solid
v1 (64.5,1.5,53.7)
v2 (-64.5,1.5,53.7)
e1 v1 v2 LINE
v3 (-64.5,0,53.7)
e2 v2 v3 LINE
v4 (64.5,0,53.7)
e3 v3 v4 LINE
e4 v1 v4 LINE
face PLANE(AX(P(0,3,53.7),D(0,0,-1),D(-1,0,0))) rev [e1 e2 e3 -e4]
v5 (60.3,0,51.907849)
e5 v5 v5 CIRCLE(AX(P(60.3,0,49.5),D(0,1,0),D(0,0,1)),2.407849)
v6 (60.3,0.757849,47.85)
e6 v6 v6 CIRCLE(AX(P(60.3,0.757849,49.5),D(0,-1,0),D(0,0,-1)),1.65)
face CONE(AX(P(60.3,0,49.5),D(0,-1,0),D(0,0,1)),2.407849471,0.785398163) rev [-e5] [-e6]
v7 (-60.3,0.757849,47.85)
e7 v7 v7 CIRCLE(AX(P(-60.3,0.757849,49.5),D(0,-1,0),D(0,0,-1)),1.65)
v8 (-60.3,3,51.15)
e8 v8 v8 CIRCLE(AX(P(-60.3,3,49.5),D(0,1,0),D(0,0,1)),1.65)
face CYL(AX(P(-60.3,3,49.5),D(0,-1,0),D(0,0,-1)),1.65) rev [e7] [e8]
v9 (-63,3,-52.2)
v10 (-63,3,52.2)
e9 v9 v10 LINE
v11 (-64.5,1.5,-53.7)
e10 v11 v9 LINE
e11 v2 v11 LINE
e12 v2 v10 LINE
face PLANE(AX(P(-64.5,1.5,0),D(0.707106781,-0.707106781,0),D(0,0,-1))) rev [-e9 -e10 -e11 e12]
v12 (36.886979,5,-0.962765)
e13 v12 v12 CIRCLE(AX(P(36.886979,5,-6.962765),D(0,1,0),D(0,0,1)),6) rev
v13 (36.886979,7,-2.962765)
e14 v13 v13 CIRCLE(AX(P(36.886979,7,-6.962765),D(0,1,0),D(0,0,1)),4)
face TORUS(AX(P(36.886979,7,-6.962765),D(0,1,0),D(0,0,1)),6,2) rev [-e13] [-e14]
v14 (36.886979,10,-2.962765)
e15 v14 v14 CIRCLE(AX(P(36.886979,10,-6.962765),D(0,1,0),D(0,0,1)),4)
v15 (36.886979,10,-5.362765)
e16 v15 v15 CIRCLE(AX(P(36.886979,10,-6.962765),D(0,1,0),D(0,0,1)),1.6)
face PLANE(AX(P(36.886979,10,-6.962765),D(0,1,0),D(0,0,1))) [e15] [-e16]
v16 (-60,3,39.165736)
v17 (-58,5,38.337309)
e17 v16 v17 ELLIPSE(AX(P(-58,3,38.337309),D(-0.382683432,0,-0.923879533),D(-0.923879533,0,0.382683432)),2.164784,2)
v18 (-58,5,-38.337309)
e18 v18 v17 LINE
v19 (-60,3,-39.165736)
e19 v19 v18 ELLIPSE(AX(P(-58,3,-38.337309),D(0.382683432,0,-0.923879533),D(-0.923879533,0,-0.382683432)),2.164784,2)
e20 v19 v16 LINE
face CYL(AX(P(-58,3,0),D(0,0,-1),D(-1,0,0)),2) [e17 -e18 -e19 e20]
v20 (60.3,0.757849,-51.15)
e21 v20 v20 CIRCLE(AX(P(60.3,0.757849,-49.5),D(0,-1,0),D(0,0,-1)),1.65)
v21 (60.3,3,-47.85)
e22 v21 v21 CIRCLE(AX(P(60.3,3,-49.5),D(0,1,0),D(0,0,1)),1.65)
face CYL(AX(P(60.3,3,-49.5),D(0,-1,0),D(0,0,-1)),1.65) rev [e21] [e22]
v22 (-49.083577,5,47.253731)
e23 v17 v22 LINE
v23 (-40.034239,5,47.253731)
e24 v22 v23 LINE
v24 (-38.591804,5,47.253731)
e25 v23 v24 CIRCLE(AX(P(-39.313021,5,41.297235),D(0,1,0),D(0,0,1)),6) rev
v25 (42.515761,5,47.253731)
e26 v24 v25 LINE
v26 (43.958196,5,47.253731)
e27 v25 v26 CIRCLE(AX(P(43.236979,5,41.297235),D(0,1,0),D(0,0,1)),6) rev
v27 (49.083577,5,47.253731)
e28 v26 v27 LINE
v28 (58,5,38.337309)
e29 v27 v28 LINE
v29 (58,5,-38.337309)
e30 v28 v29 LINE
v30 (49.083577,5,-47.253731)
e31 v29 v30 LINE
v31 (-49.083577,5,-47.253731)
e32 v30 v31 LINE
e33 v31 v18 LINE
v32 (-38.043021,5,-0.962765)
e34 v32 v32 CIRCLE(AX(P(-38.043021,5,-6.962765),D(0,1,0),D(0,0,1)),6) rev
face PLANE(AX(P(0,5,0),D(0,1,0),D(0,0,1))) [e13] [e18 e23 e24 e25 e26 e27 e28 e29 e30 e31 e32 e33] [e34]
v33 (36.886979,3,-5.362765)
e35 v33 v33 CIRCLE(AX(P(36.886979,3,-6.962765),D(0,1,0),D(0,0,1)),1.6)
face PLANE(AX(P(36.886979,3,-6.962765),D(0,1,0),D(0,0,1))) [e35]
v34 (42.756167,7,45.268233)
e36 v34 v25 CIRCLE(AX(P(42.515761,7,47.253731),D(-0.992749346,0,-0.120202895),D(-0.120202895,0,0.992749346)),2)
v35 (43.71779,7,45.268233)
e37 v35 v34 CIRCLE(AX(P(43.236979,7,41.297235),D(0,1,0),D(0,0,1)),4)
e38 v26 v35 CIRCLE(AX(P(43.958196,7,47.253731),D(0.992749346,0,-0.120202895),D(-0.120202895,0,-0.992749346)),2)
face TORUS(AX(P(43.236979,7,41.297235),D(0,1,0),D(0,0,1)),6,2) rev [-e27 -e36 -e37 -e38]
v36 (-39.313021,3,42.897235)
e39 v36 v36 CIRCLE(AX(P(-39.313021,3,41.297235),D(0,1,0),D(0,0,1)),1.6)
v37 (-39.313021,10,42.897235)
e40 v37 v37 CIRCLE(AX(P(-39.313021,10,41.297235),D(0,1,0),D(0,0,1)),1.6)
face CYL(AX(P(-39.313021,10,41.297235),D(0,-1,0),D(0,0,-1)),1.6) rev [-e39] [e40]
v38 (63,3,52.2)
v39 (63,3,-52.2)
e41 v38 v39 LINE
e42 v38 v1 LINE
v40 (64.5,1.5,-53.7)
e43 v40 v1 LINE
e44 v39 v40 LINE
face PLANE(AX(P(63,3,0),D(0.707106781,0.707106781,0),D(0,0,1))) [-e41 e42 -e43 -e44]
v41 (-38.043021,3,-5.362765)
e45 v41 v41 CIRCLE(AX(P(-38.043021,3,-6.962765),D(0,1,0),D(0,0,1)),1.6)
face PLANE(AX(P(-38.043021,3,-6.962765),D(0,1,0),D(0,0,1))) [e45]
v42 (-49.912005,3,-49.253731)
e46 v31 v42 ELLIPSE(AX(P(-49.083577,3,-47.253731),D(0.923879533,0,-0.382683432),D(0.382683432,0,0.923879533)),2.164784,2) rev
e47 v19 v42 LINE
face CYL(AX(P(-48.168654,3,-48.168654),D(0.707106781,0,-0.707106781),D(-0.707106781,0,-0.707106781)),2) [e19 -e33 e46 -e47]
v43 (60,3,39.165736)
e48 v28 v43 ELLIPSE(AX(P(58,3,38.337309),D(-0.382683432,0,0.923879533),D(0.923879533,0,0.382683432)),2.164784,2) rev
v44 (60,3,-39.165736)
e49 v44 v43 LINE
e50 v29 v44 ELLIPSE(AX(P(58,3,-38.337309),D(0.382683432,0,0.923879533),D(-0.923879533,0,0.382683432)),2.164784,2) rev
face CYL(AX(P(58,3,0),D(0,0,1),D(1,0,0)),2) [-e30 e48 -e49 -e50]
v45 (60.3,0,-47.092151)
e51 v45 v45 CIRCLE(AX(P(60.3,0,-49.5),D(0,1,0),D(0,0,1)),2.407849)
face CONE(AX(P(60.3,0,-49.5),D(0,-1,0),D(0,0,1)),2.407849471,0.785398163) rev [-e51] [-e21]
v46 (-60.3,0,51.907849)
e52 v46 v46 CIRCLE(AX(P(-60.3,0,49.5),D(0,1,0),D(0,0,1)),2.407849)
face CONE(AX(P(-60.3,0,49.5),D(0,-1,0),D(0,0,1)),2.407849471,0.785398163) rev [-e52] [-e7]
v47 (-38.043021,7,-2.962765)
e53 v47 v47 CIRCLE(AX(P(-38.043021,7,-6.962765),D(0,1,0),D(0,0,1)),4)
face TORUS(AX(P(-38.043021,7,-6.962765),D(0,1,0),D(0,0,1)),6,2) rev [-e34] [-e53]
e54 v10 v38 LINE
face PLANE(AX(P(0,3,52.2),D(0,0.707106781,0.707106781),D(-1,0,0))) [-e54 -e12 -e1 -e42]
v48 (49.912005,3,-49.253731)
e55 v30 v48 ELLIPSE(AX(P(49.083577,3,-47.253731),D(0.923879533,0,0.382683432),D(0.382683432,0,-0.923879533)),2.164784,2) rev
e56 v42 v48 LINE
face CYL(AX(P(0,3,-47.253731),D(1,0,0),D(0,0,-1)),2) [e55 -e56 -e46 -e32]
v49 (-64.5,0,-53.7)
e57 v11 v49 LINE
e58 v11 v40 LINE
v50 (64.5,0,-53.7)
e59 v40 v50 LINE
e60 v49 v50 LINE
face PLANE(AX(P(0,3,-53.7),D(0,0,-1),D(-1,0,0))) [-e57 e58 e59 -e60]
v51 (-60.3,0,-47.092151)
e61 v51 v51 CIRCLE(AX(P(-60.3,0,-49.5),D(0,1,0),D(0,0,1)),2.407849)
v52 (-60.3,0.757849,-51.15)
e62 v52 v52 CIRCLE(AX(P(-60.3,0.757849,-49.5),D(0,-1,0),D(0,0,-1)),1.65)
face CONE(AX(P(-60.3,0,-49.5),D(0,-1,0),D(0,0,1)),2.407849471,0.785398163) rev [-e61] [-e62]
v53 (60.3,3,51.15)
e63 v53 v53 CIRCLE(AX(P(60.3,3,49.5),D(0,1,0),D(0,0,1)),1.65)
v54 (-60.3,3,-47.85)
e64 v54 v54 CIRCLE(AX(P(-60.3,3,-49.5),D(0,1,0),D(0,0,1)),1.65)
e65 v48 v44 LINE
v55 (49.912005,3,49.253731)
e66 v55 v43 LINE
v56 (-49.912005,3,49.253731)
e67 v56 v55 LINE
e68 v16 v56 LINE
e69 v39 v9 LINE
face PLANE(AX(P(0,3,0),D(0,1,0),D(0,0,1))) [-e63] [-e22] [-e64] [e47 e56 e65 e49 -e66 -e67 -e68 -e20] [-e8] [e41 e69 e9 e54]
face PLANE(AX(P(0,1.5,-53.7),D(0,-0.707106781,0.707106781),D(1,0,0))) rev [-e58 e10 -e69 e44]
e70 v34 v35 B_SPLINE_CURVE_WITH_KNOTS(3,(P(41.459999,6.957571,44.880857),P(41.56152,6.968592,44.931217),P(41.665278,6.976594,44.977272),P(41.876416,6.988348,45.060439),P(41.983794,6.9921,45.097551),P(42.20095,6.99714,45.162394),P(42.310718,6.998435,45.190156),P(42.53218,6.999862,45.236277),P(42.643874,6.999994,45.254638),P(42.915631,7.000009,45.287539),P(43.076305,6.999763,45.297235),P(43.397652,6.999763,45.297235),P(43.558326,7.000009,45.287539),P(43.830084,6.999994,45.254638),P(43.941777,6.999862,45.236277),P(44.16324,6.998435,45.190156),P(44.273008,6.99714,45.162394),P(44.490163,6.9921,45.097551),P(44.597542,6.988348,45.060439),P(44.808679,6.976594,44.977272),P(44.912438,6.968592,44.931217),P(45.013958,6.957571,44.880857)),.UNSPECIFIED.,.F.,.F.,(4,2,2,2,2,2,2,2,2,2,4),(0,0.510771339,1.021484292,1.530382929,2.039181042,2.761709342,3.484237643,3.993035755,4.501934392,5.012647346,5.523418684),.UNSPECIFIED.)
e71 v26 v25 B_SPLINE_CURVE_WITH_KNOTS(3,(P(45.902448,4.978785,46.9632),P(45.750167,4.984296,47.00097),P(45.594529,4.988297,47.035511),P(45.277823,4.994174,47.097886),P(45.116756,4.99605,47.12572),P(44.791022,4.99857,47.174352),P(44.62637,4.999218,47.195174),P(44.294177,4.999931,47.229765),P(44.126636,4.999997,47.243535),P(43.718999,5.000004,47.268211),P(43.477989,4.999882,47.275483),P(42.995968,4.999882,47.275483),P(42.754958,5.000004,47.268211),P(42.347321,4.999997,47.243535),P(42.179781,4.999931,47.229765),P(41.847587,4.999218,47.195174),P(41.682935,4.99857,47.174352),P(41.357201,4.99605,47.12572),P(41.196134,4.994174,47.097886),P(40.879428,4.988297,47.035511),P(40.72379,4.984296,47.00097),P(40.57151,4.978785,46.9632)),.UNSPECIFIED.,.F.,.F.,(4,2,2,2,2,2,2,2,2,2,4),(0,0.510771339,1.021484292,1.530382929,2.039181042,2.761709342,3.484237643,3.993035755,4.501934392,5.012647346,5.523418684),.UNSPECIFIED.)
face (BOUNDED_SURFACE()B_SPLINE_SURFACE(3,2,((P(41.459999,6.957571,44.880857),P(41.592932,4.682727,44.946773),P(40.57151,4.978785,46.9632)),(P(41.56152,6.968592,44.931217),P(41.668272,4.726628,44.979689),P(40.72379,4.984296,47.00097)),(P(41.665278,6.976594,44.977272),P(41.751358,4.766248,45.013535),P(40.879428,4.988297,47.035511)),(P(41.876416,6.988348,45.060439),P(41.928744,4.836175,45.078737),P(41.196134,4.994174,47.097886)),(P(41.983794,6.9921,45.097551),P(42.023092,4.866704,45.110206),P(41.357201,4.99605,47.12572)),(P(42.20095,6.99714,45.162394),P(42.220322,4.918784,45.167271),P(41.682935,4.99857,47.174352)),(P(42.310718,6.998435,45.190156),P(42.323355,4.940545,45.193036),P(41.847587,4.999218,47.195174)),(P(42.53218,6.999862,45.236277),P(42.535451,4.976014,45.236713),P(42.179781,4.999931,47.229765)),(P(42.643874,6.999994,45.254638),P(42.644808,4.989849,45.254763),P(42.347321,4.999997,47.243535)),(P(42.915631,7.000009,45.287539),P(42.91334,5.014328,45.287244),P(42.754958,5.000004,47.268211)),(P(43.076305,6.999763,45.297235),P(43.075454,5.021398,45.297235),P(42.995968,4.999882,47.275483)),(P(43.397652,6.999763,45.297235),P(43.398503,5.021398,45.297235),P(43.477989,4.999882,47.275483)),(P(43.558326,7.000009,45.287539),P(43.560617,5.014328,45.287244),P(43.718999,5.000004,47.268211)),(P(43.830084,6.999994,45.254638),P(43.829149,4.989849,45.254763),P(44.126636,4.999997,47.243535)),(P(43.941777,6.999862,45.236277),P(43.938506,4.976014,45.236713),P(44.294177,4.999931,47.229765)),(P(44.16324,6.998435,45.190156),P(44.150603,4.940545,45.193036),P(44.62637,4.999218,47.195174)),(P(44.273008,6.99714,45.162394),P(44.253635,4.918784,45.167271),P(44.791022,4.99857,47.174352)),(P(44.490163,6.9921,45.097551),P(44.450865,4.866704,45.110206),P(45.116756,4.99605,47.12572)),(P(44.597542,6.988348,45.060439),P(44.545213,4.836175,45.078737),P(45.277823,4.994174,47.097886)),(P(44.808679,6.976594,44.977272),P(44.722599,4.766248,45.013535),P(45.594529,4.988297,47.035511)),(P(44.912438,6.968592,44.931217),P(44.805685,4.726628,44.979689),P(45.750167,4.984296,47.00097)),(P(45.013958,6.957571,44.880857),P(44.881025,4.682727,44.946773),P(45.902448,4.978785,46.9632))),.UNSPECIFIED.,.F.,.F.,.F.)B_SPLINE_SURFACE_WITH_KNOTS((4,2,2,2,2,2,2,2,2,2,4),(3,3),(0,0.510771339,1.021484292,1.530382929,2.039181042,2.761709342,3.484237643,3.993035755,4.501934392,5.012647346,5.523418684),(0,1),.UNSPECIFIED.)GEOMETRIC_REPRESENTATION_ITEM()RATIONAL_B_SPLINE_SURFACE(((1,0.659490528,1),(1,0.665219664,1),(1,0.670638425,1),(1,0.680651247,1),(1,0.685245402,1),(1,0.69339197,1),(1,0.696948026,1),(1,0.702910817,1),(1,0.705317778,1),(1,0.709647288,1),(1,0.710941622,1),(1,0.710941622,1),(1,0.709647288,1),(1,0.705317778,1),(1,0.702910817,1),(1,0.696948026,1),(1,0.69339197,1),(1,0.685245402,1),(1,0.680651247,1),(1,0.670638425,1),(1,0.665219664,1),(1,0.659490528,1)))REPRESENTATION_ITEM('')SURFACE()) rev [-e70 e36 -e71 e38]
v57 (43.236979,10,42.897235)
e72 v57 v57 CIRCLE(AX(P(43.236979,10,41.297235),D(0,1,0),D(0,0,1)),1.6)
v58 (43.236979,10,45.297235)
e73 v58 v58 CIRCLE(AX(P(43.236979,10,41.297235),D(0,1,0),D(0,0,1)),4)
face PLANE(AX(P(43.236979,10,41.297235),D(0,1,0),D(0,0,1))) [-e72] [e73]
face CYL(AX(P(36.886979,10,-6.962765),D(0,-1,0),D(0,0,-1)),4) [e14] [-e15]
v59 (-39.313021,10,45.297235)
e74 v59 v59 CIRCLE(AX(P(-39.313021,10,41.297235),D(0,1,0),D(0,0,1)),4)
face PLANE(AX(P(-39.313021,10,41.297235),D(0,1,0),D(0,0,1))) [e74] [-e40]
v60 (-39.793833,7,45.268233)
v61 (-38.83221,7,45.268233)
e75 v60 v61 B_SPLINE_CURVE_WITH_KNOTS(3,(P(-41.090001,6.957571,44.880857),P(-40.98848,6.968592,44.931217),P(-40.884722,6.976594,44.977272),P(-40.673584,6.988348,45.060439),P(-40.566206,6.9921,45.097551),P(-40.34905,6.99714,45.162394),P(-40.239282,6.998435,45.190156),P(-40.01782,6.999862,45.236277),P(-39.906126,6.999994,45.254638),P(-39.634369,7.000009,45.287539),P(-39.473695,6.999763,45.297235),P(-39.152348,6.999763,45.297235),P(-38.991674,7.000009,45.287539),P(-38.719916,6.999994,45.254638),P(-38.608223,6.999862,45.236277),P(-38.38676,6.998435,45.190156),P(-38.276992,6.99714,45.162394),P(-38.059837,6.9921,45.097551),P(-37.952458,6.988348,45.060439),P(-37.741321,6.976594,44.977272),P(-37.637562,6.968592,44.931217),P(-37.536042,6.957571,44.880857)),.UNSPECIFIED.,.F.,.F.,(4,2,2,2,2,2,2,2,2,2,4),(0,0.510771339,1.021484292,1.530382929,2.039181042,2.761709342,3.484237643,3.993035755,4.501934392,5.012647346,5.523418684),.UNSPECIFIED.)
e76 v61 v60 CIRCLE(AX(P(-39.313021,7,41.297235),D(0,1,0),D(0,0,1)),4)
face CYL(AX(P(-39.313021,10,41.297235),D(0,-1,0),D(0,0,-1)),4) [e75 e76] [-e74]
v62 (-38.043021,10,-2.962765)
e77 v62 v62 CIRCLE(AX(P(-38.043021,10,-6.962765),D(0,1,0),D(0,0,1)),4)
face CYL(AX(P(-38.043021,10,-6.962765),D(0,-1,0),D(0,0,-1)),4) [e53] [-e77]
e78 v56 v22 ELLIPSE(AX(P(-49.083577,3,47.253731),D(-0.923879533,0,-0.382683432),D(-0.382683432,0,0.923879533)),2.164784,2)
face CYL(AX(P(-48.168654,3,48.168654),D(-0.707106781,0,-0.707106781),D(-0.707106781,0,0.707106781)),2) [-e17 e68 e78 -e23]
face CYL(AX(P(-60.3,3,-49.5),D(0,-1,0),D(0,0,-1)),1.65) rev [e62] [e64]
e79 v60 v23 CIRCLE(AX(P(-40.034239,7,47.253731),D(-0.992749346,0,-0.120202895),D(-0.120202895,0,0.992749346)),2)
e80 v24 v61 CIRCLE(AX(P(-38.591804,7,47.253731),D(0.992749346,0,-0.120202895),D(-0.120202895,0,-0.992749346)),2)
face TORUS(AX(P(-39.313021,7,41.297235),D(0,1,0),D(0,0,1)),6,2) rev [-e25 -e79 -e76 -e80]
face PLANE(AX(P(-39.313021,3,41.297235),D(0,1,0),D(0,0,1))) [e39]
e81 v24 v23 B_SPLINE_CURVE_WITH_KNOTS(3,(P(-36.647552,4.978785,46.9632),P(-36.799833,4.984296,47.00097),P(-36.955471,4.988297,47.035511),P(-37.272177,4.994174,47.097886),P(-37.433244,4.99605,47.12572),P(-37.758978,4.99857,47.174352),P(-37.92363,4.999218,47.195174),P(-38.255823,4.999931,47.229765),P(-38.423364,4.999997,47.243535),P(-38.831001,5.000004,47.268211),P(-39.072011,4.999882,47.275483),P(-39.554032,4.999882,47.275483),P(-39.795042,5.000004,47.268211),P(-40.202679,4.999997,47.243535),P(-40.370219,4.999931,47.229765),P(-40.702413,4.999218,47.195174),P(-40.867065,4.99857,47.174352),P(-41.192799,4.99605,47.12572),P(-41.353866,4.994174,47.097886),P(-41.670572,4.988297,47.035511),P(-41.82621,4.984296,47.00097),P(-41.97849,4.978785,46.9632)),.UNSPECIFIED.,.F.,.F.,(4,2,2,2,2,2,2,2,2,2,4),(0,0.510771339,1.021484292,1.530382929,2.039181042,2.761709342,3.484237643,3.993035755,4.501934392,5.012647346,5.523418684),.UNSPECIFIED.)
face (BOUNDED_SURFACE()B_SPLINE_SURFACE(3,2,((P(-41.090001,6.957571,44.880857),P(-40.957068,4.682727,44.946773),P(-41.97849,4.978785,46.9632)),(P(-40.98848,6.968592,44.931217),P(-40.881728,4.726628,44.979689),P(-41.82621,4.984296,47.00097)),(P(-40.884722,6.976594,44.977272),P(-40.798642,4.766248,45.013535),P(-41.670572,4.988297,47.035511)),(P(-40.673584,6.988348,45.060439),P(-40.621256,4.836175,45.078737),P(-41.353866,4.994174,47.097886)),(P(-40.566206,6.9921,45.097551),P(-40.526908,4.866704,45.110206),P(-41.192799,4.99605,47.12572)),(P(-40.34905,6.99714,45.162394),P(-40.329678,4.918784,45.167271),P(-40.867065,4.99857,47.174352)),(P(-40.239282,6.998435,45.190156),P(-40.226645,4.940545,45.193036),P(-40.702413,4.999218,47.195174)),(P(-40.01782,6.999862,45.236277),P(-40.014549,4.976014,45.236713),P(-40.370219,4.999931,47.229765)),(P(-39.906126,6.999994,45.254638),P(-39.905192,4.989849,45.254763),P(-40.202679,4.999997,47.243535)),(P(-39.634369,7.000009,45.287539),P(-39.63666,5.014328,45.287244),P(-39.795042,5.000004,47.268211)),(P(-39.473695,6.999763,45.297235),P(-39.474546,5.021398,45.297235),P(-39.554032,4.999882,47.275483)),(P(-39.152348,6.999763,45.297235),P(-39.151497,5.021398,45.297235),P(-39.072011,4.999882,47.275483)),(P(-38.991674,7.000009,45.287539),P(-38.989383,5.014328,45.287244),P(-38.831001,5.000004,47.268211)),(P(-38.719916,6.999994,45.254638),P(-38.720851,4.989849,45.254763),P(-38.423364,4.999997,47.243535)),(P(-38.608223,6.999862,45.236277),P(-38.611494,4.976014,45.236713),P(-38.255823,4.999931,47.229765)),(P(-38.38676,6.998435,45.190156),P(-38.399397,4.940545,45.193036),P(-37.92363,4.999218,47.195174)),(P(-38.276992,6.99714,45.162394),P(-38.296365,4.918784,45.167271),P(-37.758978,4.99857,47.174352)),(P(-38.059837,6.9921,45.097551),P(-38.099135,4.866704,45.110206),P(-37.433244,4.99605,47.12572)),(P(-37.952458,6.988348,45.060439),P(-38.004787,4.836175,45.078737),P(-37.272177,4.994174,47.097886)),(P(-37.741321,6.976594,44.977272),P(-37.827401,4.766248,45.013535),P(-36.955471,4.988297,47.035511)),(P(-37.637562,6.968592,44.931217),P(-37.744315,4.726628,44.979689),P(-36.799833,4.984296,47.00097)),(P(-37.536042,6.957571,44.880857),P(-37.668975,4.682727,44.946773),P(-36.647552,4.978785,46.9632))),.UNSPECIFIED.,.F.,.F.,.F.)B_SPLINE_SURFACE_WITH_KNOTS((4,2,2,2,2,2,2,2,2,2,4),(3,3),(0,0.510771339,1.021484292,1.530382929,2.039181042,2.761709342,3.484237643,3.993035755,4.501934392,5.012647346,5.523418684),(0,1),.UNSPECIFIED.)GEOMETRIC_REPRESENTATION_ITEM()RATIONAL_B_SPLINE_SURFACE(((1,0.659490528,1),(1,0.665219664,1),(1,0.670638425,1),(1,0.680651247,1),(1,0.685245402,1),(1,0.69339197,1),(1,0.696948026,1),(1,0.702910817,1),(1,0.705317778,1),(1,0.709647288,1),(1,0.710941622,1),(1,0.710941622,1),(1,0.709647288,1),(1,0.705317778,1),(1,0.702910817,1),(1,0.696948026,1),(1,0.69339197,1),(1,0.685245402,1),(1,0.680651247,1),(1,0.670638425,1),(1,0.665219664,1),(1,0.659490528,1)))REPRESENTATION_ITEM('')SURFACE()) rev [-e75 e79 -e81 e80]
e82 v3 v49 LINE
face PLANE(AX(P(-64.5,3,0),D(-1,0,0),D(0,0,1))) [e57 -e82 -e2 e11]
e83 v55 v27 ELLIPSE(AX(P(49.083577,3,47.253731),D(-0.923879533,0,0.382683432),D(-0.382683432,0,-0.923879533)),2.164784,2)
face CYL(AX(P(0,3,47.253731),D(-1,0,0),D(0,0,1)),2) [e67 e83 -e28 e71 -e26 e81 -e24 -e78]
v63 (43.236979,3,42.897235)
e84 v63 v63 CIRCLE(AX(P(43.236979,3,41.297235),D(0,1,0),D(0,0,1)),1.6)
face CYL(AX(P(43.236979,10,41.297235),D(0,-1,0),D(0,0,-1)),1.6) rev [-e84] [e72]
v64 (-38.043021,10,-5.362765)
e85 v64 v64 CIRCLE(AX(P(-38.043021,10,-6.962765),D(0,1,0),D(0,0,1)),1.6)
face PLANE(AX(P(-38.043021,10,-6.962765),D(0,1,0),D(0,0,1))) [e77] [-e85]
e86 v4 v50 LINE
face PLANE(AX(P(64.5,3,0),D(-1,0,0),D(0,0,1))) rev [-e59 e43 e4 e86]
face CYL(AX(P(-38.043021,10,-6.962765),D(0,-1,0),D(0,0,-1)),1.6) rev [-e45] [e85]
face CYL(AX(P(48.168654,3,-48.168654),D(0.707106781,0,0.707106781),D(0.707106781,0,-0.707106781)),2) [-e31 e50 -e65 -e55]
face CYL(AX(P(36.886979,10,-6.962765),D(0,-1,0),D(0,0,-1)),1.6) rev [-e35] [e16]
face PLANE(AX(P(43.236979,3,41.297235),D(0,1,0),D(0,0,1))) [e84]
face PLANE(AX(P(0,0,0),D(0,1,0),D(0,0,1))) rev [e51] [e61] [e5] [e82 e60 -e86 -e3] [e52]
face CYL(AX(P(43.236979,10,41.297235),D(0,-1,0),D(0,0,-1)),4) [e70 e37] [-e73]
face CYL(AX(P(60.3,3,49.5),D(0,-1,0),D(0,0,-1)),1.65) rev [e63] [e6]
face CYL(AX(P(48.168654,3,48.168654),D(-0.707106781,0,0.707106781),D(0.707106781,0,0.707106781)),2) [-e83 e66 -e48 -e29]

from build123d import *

# Parameters (mm, degrees)
SKETCH1_W                    = 129
SKETCH1_H                    = 107.4
SKETCH1_R                    = 1.65
BOSS_EXTRUDE1_DEPTH          = 3
BOSS_EXTRUDE2_DEPTH          = 5
BOSS_EXTRUDE3_START          = 5
SKETCH2_R                    = 4
SKETCH2_R_2                  = 1.6
BOSS_EXTRUDE3_DEPTH          = 5
CUT_EXTRUDE1_START           = 3
CUT_EXTRUDE1_OUTLINE_R       = 1.6
CUT_EXTRUDE1_DEPTH           = 2
FILLET3_R                    = 2
FILLET4_R                    = 2
SKETCH1_4_R                  = 2.407849471
CUT_EXTRUDE2_DEPTH           = 1
CUT_EXTRUDE2_DRAFT           = 45
CUT_EXTRUDE2_PROFILE_2_DEPTH = 1
CUT_EXTRUDE2_PROFILE_2_DRAFT = 45
CUT_EXTRUDE2_PROFILE_3_DEPTH = 1
CUT_EXTRUDE2_PROFILE_3_DRAFT = 45
CUT_EXTRUDE2_PROFILE_4_DEPTH = 1
CUT_EXTRUDE2_PROFILE_4_DRAFT = 45
CHAMFER1_SIZE                = 1.5


# Read off the part's stored shape, not the designer's step: Cut-Extrude1
with BuildPart() as part:
    # Sketch1 → Boss-Extrude1 (new body)
    with BuildSketch(Plane(origin=(0, 0, 0), x_dir=(1, 0, 0), z_dir=(0, 1, 0))):
        Rectangle(SKETCH1_W, SKETCH1_H)
        with Locations(Location((-60.3, -49.5, 0), (0, 0, 270))):
            Circle(SKETCH1_R, mode=Mode.SUBTRACT)
        with Locations(Location((60.3, -49.5, 0), (0, 0, 270))):
            Circle(SKETCH1_R, mode=Mode.SUBTRACT)
        with Locations(Location((-60.3, 49.5, 0), (0, 0, 270))):
            Circle(SKETCH1_R, mode=Mode.SUBTRACT)
        Polygon((49.912004588, -49.253731343), (-49.912004588, -49.253731343), (-60, -39.165735931), (-60, 39.165735931), (-49.912004588, 49.253731343), (49.912004588, 49.253731343), (60, 39.165735931), (60, -39.165735931), align=None, mode=Mode.SUBTRACT)
        with Locations(Location((60.3, 49.5, 0), (0, 0, 270))):
            Circle(SKETCH1_R, mode=Mode.SUBTRACT)
    extrude(amount=BOSS_EXTRUDE1_DEPTH)

    # Sketch1<3> → Boss-Extrude2 (add)
    with BuildSketch(Plane(origin=(0, 0, 0), x_dir=(1, 0, 0), z_dir=(0, 1, 0))):
        Polygon((-49.912004588, 49.253731343), (-60, 39.165735931), (-60, -39.165735931), (-49.912004588, -49.253731343), (49.912004588, -49.253731343), (60, -39.165735931), (60, 39.165735931), (49.912004588, 49.253731343), align=None)
    extrude(amount=BOSS_EXTRUDE2_DEPTH)

    # Sketch2 → Boss-Extrude3 (add)
    # profile 1 of 4: a face of its own
    with BuildSketch(Plane(origin=(0, 0, 0), x_dir=(1, 0, 0), z_dir=(0, 1, 0)).offset(BOSS_EXTRUDE3_START)):
        with Locations(Location((-39.313021369, -41.297235267, 0), (0, 0, 270))):
            Circle(SKETCH2_R)
        with Locations(Location((-39.313021369, -41.297235267, 0), (0, 0, 270))):
            Circle(SKETCH2_R_2, mode=Mode.SUBTRACT)
    # profile 2 of 4: a face of its own
    with BuildSketch(Plane(origin=(0, 0, 0), x_dir=(1, 0, 0), z_dir=(0, 1, 0)).offset(BOSS_EXTRUDE3_START)):
        with Locations(Location((36.886978631, 6.962764733, 0), (0, 0, 270))):
            Circle(SKETCH2_R)
        with Locations(Location((36.886978631, 6.962764733, 0), (0, 0, 270))):
            Circle(SKETCH2_R_2, mode=Mode.SUBTRACT)
    # profile 3 of 4: a face of its own
    with BuildSketch(Plane(origin=(0, 0, 0), x_dir=(1, 0, 0), z_dir=(0, 1, 0)).offset(BOSS_EXTRUDE3_START)):
        with Locations(Location((-38.043021369, 6.962764733, 0), (0, 0, 270))):
            Circle(SKETCH2_R)
        with Locations(Location((-38.043021369, 6.962764733, 0), (0, 0, 270))):
            Circle(SKETCH2_R_2, mode=Mode.SUBTRACT)
    # profile 4 of 4: a face of its own
    with BuildSketch(Plane(origin=(0, 0, 0), x_dir=(1, 0, 0), z_dir=(0, 1, 0)).offset(BOSS_EXTRUDE3_START)):
        with Locations(Location((43.236978631, -41.297235267, 0), (0, 0, 270))):
            Circle(SKETCH2_R)
        with Locations(Location((43.236978631, -41.297235267, 0), (0, 0, 270))):
            Circle(SKETCH2_R_2, mode=Mode.SUBTRACT)
    extrude(amount=BOSS_EXTRUDE3_DEPTH)

    # Cut-Extrude1 outline → Cut-Extrude1 (cut)
    with BuildSketch(Plane(origin=(0, 0, 0), x_dir=(1, 0, 0), z_dir=(0, 1, 0)).offset(CUT_EXTRUDE1_START)):
        with Locations((-38.043021369, 6.962764733)):
            Circle(CUT_EXTRUDE1_OUTLINE_R)
        with Locations((-39.313021369, -41.297235267)):
            Circle(CUT_EXTRUDE1_OUTLINE_R)
        with Locations((43.236978631, -41.297235267)):
            Circle(CUT_EXTRUDE1_OUTLINE_R)
        with Locations((36.886978631, 6.962764733)):
            Circle(CUT_EXTRUDE1_OUTLINE_R)
    extrude(amount=CUT_EXTRUDE1_DEPTH, mode=Mode.SUBTRACT)

    # Fillet3
    fillet3_edges = [part.edges().sort_by_distance(p)[0] for p in [
        (-54.956002294, 5, -44.209733637),
        (54.956002294, 5, -44.209733637),
        (0, 5, -49.253731343),
        (54.956002294, 5, 44.209733637),
        (60, 5, 0),
        (-60, 5, 0),
        (-54.956002294, 5, 44.209733637),
        (0, 5, 49.253731343),
    ]]
    fillet(fillet3_edges, radius=FILLET3_R - 0.0001)  # a hair under: the kernel refuses the full size

    # Fillet4
    fillet4_edges = [part.edges().sort_by_distance(p)[0] for p in [
        (-39.313021369, 5, 37.297235267),
        (43.236978631, 5, 37.297235267),
        (36.886978631, 5, -10.962764733),
        (-38.043021369, 5, -10.962764733),
    ]]
    fillet(fillet4_edges, radius=FILLET4_R)


with BuildPart() as cut_extrude2_tool:
    # Sketch1<4> → Cut-Extrude2 (with draft: the straight prism first)
    with BuildSketch(Plane(origin=(0, 0, 0), x_dir=(1, 0, 0), z_dir=(0, 1, 0))):
        with Locations((-60.3, 49.5)):
            Circle(SKETCH1_4_R)
    extrude(amount=CUT_EXTRUDE2_DEPTH)
    # Cut-Extrude2: the draft: its side faces are tilted about the plane it starts from
    cut_extrude2_sides = [cut_extrude2_tool.faces().sort_by_distance(p)[0] for p in [
        (-62.707849471, 0.5, -49.5),
    ]]
    draft(cut_extrude2_sides, Plane(origin=(0, 0, 0), x_dir=(1, 0, 0), z_dir=(0, 1, 0)), CUT_EXTRUDE2_DRAFT)


with BuildPart() as part_1:
    add(part.part)

    # Cut-Extrude2: cut by cut_extrude2_tool
    add(cut_extrude2_tool.part, mode=Mode.SUBTRACT)


with BuildPart() as cut_extrude2_profile_2_tool:
    # Sketch1<4> → Cut-Extrude2 profile 2 (with draft: the straight prism first)
    with BuildSketch(Plane(origin=(0, 0, 0), x_dir=(1, 0, 0), z_dir=(0, 1, 0))):
        with Locations((-60.3, -49.5)):
            Circle(SKETCH1_4_R)
    extrude(amount=CUT_EXTRUDE2_PROFILE_2_DEPTH)
    # Cut-Extrude2 profile 2: the draft: its side faces are tilted about the plane it starts from
    cut_extrude2_profile_2_sides = [cut_extrude2_profile_2_tool.faces().sort_by_distance(p)[0] for p in [
        (-62.707849471, 0.5, 49.5),
    ]]
    draft(cut_extrude2_profile_2_sides, Plane(origin=(0, 0, 0), x_dir=(1, 0, 0), z_dir=(0, 1, 0)), CUT_EXTRUDE2_PROFILE_2_DRAFT)


with BuildPart() as part_2:
    add(part_1.part)

    # Cut-Extrude2 profile 2: cut by cut_extrude2_profile_2_tool
    add(cut_extrude2_profile_2_tool.part, mode=Mode.SUBTRACT)


with BuildPart() as cut_extrude2_profile_3_tool:
    # Sketch1<4> → Cut-Extrude2 profile 3 (with draft: the straight prism first)
    with BuildSketch(Plane(origin=(0, 0, 0), x_dir=(1, 0, 0), z_dir=(0, 1, 0))):
        with Locations((60.3, -49.5)):
            Circle(SKETCH1_4_R)
    extrude(amount=CUT_EXTRUDE2_PROFILE_3_DEPTH)
    # Cut-Extrude2 profile 3: the draft: its side faces are tilted about the plane it starts from
    cut_extrude2_profile_3_sides = [cut_extrude2_profile_3_tool.faces().sort_by_distance(p)[0] for p in [
        (57.892150529, 0.5, 49.5),
    ]]
    draft(cut_extrude2_profile_3_sides, Plane(origin=(0, 0, 0), x_dir=(1, 0, 0), z_dir=(0, 1, 0)), CUT_EXTRUDE2_PROFILE_3_DRAFT)


with BuildPart() as part_3:
    add(part_2.part)

    # Cut-Extrude2 profile 3: cut by cut_extrude2_profile_3_tool
    add(cut_extrude2_profile_3_tool.part, mode=Mode.SUBTRACT)


with BuildPart() as cut_extrude2_profile_4_tool:
    # Sketch1<4> → Cut-Extrude2 profile 4 (with draft: the straight prism first)
    with BuildSketch(Plane(origin=(0, 0, 0), x_dir=(1, 0, 0), z_dir=(0, 1, 0))):
        with Locations((60.3, 49.5)):
            Circle(SKETCH1_4_R)
    extrude(amount=CUT_EXTRUDE2_PROFILE_4_DEPTH)
    # Cut-Extrude2 profile 4: the draft: its side faces are tilted about the plane it starts from
    cut_extrude2_profile_4_sides = [cut_extrude2_profile_4_tool.faces().sort_by_distance(p)[0] for p in [
        (57.892150529, 0.5, -49.5),
    ]]
    draft(cut_extrude2_profile_4_sides, Plane(origin=(0, 0, 0), x_dir=(1, 0, 0), z_dir=(0, 1, 0)), CUT_EXTRUDE2_PROFILE_4_DRAFT)


with BuildPart() as part_4:
    add(part_3.part)

    # Cut-Extrude2 profile 4: cut by cut_extrude2_profile_4_tool
    add(cut_extrude2_profile_4_tool.part, mode=Mode.SUBTRACT)

    # Chamfer1
    chamfer1_edges = [part_4.edges().sort_by_distance(p)[0] for p in [
        (0, 3, 53.7),
        (64.5, 3, 0),
        (0, 3, -53.7),
        (-64.5, 3, 0),
    ]]
    chamfer(chamfer1_edges, length=CHAMFER1_SIZE)


solid = part_4.part
